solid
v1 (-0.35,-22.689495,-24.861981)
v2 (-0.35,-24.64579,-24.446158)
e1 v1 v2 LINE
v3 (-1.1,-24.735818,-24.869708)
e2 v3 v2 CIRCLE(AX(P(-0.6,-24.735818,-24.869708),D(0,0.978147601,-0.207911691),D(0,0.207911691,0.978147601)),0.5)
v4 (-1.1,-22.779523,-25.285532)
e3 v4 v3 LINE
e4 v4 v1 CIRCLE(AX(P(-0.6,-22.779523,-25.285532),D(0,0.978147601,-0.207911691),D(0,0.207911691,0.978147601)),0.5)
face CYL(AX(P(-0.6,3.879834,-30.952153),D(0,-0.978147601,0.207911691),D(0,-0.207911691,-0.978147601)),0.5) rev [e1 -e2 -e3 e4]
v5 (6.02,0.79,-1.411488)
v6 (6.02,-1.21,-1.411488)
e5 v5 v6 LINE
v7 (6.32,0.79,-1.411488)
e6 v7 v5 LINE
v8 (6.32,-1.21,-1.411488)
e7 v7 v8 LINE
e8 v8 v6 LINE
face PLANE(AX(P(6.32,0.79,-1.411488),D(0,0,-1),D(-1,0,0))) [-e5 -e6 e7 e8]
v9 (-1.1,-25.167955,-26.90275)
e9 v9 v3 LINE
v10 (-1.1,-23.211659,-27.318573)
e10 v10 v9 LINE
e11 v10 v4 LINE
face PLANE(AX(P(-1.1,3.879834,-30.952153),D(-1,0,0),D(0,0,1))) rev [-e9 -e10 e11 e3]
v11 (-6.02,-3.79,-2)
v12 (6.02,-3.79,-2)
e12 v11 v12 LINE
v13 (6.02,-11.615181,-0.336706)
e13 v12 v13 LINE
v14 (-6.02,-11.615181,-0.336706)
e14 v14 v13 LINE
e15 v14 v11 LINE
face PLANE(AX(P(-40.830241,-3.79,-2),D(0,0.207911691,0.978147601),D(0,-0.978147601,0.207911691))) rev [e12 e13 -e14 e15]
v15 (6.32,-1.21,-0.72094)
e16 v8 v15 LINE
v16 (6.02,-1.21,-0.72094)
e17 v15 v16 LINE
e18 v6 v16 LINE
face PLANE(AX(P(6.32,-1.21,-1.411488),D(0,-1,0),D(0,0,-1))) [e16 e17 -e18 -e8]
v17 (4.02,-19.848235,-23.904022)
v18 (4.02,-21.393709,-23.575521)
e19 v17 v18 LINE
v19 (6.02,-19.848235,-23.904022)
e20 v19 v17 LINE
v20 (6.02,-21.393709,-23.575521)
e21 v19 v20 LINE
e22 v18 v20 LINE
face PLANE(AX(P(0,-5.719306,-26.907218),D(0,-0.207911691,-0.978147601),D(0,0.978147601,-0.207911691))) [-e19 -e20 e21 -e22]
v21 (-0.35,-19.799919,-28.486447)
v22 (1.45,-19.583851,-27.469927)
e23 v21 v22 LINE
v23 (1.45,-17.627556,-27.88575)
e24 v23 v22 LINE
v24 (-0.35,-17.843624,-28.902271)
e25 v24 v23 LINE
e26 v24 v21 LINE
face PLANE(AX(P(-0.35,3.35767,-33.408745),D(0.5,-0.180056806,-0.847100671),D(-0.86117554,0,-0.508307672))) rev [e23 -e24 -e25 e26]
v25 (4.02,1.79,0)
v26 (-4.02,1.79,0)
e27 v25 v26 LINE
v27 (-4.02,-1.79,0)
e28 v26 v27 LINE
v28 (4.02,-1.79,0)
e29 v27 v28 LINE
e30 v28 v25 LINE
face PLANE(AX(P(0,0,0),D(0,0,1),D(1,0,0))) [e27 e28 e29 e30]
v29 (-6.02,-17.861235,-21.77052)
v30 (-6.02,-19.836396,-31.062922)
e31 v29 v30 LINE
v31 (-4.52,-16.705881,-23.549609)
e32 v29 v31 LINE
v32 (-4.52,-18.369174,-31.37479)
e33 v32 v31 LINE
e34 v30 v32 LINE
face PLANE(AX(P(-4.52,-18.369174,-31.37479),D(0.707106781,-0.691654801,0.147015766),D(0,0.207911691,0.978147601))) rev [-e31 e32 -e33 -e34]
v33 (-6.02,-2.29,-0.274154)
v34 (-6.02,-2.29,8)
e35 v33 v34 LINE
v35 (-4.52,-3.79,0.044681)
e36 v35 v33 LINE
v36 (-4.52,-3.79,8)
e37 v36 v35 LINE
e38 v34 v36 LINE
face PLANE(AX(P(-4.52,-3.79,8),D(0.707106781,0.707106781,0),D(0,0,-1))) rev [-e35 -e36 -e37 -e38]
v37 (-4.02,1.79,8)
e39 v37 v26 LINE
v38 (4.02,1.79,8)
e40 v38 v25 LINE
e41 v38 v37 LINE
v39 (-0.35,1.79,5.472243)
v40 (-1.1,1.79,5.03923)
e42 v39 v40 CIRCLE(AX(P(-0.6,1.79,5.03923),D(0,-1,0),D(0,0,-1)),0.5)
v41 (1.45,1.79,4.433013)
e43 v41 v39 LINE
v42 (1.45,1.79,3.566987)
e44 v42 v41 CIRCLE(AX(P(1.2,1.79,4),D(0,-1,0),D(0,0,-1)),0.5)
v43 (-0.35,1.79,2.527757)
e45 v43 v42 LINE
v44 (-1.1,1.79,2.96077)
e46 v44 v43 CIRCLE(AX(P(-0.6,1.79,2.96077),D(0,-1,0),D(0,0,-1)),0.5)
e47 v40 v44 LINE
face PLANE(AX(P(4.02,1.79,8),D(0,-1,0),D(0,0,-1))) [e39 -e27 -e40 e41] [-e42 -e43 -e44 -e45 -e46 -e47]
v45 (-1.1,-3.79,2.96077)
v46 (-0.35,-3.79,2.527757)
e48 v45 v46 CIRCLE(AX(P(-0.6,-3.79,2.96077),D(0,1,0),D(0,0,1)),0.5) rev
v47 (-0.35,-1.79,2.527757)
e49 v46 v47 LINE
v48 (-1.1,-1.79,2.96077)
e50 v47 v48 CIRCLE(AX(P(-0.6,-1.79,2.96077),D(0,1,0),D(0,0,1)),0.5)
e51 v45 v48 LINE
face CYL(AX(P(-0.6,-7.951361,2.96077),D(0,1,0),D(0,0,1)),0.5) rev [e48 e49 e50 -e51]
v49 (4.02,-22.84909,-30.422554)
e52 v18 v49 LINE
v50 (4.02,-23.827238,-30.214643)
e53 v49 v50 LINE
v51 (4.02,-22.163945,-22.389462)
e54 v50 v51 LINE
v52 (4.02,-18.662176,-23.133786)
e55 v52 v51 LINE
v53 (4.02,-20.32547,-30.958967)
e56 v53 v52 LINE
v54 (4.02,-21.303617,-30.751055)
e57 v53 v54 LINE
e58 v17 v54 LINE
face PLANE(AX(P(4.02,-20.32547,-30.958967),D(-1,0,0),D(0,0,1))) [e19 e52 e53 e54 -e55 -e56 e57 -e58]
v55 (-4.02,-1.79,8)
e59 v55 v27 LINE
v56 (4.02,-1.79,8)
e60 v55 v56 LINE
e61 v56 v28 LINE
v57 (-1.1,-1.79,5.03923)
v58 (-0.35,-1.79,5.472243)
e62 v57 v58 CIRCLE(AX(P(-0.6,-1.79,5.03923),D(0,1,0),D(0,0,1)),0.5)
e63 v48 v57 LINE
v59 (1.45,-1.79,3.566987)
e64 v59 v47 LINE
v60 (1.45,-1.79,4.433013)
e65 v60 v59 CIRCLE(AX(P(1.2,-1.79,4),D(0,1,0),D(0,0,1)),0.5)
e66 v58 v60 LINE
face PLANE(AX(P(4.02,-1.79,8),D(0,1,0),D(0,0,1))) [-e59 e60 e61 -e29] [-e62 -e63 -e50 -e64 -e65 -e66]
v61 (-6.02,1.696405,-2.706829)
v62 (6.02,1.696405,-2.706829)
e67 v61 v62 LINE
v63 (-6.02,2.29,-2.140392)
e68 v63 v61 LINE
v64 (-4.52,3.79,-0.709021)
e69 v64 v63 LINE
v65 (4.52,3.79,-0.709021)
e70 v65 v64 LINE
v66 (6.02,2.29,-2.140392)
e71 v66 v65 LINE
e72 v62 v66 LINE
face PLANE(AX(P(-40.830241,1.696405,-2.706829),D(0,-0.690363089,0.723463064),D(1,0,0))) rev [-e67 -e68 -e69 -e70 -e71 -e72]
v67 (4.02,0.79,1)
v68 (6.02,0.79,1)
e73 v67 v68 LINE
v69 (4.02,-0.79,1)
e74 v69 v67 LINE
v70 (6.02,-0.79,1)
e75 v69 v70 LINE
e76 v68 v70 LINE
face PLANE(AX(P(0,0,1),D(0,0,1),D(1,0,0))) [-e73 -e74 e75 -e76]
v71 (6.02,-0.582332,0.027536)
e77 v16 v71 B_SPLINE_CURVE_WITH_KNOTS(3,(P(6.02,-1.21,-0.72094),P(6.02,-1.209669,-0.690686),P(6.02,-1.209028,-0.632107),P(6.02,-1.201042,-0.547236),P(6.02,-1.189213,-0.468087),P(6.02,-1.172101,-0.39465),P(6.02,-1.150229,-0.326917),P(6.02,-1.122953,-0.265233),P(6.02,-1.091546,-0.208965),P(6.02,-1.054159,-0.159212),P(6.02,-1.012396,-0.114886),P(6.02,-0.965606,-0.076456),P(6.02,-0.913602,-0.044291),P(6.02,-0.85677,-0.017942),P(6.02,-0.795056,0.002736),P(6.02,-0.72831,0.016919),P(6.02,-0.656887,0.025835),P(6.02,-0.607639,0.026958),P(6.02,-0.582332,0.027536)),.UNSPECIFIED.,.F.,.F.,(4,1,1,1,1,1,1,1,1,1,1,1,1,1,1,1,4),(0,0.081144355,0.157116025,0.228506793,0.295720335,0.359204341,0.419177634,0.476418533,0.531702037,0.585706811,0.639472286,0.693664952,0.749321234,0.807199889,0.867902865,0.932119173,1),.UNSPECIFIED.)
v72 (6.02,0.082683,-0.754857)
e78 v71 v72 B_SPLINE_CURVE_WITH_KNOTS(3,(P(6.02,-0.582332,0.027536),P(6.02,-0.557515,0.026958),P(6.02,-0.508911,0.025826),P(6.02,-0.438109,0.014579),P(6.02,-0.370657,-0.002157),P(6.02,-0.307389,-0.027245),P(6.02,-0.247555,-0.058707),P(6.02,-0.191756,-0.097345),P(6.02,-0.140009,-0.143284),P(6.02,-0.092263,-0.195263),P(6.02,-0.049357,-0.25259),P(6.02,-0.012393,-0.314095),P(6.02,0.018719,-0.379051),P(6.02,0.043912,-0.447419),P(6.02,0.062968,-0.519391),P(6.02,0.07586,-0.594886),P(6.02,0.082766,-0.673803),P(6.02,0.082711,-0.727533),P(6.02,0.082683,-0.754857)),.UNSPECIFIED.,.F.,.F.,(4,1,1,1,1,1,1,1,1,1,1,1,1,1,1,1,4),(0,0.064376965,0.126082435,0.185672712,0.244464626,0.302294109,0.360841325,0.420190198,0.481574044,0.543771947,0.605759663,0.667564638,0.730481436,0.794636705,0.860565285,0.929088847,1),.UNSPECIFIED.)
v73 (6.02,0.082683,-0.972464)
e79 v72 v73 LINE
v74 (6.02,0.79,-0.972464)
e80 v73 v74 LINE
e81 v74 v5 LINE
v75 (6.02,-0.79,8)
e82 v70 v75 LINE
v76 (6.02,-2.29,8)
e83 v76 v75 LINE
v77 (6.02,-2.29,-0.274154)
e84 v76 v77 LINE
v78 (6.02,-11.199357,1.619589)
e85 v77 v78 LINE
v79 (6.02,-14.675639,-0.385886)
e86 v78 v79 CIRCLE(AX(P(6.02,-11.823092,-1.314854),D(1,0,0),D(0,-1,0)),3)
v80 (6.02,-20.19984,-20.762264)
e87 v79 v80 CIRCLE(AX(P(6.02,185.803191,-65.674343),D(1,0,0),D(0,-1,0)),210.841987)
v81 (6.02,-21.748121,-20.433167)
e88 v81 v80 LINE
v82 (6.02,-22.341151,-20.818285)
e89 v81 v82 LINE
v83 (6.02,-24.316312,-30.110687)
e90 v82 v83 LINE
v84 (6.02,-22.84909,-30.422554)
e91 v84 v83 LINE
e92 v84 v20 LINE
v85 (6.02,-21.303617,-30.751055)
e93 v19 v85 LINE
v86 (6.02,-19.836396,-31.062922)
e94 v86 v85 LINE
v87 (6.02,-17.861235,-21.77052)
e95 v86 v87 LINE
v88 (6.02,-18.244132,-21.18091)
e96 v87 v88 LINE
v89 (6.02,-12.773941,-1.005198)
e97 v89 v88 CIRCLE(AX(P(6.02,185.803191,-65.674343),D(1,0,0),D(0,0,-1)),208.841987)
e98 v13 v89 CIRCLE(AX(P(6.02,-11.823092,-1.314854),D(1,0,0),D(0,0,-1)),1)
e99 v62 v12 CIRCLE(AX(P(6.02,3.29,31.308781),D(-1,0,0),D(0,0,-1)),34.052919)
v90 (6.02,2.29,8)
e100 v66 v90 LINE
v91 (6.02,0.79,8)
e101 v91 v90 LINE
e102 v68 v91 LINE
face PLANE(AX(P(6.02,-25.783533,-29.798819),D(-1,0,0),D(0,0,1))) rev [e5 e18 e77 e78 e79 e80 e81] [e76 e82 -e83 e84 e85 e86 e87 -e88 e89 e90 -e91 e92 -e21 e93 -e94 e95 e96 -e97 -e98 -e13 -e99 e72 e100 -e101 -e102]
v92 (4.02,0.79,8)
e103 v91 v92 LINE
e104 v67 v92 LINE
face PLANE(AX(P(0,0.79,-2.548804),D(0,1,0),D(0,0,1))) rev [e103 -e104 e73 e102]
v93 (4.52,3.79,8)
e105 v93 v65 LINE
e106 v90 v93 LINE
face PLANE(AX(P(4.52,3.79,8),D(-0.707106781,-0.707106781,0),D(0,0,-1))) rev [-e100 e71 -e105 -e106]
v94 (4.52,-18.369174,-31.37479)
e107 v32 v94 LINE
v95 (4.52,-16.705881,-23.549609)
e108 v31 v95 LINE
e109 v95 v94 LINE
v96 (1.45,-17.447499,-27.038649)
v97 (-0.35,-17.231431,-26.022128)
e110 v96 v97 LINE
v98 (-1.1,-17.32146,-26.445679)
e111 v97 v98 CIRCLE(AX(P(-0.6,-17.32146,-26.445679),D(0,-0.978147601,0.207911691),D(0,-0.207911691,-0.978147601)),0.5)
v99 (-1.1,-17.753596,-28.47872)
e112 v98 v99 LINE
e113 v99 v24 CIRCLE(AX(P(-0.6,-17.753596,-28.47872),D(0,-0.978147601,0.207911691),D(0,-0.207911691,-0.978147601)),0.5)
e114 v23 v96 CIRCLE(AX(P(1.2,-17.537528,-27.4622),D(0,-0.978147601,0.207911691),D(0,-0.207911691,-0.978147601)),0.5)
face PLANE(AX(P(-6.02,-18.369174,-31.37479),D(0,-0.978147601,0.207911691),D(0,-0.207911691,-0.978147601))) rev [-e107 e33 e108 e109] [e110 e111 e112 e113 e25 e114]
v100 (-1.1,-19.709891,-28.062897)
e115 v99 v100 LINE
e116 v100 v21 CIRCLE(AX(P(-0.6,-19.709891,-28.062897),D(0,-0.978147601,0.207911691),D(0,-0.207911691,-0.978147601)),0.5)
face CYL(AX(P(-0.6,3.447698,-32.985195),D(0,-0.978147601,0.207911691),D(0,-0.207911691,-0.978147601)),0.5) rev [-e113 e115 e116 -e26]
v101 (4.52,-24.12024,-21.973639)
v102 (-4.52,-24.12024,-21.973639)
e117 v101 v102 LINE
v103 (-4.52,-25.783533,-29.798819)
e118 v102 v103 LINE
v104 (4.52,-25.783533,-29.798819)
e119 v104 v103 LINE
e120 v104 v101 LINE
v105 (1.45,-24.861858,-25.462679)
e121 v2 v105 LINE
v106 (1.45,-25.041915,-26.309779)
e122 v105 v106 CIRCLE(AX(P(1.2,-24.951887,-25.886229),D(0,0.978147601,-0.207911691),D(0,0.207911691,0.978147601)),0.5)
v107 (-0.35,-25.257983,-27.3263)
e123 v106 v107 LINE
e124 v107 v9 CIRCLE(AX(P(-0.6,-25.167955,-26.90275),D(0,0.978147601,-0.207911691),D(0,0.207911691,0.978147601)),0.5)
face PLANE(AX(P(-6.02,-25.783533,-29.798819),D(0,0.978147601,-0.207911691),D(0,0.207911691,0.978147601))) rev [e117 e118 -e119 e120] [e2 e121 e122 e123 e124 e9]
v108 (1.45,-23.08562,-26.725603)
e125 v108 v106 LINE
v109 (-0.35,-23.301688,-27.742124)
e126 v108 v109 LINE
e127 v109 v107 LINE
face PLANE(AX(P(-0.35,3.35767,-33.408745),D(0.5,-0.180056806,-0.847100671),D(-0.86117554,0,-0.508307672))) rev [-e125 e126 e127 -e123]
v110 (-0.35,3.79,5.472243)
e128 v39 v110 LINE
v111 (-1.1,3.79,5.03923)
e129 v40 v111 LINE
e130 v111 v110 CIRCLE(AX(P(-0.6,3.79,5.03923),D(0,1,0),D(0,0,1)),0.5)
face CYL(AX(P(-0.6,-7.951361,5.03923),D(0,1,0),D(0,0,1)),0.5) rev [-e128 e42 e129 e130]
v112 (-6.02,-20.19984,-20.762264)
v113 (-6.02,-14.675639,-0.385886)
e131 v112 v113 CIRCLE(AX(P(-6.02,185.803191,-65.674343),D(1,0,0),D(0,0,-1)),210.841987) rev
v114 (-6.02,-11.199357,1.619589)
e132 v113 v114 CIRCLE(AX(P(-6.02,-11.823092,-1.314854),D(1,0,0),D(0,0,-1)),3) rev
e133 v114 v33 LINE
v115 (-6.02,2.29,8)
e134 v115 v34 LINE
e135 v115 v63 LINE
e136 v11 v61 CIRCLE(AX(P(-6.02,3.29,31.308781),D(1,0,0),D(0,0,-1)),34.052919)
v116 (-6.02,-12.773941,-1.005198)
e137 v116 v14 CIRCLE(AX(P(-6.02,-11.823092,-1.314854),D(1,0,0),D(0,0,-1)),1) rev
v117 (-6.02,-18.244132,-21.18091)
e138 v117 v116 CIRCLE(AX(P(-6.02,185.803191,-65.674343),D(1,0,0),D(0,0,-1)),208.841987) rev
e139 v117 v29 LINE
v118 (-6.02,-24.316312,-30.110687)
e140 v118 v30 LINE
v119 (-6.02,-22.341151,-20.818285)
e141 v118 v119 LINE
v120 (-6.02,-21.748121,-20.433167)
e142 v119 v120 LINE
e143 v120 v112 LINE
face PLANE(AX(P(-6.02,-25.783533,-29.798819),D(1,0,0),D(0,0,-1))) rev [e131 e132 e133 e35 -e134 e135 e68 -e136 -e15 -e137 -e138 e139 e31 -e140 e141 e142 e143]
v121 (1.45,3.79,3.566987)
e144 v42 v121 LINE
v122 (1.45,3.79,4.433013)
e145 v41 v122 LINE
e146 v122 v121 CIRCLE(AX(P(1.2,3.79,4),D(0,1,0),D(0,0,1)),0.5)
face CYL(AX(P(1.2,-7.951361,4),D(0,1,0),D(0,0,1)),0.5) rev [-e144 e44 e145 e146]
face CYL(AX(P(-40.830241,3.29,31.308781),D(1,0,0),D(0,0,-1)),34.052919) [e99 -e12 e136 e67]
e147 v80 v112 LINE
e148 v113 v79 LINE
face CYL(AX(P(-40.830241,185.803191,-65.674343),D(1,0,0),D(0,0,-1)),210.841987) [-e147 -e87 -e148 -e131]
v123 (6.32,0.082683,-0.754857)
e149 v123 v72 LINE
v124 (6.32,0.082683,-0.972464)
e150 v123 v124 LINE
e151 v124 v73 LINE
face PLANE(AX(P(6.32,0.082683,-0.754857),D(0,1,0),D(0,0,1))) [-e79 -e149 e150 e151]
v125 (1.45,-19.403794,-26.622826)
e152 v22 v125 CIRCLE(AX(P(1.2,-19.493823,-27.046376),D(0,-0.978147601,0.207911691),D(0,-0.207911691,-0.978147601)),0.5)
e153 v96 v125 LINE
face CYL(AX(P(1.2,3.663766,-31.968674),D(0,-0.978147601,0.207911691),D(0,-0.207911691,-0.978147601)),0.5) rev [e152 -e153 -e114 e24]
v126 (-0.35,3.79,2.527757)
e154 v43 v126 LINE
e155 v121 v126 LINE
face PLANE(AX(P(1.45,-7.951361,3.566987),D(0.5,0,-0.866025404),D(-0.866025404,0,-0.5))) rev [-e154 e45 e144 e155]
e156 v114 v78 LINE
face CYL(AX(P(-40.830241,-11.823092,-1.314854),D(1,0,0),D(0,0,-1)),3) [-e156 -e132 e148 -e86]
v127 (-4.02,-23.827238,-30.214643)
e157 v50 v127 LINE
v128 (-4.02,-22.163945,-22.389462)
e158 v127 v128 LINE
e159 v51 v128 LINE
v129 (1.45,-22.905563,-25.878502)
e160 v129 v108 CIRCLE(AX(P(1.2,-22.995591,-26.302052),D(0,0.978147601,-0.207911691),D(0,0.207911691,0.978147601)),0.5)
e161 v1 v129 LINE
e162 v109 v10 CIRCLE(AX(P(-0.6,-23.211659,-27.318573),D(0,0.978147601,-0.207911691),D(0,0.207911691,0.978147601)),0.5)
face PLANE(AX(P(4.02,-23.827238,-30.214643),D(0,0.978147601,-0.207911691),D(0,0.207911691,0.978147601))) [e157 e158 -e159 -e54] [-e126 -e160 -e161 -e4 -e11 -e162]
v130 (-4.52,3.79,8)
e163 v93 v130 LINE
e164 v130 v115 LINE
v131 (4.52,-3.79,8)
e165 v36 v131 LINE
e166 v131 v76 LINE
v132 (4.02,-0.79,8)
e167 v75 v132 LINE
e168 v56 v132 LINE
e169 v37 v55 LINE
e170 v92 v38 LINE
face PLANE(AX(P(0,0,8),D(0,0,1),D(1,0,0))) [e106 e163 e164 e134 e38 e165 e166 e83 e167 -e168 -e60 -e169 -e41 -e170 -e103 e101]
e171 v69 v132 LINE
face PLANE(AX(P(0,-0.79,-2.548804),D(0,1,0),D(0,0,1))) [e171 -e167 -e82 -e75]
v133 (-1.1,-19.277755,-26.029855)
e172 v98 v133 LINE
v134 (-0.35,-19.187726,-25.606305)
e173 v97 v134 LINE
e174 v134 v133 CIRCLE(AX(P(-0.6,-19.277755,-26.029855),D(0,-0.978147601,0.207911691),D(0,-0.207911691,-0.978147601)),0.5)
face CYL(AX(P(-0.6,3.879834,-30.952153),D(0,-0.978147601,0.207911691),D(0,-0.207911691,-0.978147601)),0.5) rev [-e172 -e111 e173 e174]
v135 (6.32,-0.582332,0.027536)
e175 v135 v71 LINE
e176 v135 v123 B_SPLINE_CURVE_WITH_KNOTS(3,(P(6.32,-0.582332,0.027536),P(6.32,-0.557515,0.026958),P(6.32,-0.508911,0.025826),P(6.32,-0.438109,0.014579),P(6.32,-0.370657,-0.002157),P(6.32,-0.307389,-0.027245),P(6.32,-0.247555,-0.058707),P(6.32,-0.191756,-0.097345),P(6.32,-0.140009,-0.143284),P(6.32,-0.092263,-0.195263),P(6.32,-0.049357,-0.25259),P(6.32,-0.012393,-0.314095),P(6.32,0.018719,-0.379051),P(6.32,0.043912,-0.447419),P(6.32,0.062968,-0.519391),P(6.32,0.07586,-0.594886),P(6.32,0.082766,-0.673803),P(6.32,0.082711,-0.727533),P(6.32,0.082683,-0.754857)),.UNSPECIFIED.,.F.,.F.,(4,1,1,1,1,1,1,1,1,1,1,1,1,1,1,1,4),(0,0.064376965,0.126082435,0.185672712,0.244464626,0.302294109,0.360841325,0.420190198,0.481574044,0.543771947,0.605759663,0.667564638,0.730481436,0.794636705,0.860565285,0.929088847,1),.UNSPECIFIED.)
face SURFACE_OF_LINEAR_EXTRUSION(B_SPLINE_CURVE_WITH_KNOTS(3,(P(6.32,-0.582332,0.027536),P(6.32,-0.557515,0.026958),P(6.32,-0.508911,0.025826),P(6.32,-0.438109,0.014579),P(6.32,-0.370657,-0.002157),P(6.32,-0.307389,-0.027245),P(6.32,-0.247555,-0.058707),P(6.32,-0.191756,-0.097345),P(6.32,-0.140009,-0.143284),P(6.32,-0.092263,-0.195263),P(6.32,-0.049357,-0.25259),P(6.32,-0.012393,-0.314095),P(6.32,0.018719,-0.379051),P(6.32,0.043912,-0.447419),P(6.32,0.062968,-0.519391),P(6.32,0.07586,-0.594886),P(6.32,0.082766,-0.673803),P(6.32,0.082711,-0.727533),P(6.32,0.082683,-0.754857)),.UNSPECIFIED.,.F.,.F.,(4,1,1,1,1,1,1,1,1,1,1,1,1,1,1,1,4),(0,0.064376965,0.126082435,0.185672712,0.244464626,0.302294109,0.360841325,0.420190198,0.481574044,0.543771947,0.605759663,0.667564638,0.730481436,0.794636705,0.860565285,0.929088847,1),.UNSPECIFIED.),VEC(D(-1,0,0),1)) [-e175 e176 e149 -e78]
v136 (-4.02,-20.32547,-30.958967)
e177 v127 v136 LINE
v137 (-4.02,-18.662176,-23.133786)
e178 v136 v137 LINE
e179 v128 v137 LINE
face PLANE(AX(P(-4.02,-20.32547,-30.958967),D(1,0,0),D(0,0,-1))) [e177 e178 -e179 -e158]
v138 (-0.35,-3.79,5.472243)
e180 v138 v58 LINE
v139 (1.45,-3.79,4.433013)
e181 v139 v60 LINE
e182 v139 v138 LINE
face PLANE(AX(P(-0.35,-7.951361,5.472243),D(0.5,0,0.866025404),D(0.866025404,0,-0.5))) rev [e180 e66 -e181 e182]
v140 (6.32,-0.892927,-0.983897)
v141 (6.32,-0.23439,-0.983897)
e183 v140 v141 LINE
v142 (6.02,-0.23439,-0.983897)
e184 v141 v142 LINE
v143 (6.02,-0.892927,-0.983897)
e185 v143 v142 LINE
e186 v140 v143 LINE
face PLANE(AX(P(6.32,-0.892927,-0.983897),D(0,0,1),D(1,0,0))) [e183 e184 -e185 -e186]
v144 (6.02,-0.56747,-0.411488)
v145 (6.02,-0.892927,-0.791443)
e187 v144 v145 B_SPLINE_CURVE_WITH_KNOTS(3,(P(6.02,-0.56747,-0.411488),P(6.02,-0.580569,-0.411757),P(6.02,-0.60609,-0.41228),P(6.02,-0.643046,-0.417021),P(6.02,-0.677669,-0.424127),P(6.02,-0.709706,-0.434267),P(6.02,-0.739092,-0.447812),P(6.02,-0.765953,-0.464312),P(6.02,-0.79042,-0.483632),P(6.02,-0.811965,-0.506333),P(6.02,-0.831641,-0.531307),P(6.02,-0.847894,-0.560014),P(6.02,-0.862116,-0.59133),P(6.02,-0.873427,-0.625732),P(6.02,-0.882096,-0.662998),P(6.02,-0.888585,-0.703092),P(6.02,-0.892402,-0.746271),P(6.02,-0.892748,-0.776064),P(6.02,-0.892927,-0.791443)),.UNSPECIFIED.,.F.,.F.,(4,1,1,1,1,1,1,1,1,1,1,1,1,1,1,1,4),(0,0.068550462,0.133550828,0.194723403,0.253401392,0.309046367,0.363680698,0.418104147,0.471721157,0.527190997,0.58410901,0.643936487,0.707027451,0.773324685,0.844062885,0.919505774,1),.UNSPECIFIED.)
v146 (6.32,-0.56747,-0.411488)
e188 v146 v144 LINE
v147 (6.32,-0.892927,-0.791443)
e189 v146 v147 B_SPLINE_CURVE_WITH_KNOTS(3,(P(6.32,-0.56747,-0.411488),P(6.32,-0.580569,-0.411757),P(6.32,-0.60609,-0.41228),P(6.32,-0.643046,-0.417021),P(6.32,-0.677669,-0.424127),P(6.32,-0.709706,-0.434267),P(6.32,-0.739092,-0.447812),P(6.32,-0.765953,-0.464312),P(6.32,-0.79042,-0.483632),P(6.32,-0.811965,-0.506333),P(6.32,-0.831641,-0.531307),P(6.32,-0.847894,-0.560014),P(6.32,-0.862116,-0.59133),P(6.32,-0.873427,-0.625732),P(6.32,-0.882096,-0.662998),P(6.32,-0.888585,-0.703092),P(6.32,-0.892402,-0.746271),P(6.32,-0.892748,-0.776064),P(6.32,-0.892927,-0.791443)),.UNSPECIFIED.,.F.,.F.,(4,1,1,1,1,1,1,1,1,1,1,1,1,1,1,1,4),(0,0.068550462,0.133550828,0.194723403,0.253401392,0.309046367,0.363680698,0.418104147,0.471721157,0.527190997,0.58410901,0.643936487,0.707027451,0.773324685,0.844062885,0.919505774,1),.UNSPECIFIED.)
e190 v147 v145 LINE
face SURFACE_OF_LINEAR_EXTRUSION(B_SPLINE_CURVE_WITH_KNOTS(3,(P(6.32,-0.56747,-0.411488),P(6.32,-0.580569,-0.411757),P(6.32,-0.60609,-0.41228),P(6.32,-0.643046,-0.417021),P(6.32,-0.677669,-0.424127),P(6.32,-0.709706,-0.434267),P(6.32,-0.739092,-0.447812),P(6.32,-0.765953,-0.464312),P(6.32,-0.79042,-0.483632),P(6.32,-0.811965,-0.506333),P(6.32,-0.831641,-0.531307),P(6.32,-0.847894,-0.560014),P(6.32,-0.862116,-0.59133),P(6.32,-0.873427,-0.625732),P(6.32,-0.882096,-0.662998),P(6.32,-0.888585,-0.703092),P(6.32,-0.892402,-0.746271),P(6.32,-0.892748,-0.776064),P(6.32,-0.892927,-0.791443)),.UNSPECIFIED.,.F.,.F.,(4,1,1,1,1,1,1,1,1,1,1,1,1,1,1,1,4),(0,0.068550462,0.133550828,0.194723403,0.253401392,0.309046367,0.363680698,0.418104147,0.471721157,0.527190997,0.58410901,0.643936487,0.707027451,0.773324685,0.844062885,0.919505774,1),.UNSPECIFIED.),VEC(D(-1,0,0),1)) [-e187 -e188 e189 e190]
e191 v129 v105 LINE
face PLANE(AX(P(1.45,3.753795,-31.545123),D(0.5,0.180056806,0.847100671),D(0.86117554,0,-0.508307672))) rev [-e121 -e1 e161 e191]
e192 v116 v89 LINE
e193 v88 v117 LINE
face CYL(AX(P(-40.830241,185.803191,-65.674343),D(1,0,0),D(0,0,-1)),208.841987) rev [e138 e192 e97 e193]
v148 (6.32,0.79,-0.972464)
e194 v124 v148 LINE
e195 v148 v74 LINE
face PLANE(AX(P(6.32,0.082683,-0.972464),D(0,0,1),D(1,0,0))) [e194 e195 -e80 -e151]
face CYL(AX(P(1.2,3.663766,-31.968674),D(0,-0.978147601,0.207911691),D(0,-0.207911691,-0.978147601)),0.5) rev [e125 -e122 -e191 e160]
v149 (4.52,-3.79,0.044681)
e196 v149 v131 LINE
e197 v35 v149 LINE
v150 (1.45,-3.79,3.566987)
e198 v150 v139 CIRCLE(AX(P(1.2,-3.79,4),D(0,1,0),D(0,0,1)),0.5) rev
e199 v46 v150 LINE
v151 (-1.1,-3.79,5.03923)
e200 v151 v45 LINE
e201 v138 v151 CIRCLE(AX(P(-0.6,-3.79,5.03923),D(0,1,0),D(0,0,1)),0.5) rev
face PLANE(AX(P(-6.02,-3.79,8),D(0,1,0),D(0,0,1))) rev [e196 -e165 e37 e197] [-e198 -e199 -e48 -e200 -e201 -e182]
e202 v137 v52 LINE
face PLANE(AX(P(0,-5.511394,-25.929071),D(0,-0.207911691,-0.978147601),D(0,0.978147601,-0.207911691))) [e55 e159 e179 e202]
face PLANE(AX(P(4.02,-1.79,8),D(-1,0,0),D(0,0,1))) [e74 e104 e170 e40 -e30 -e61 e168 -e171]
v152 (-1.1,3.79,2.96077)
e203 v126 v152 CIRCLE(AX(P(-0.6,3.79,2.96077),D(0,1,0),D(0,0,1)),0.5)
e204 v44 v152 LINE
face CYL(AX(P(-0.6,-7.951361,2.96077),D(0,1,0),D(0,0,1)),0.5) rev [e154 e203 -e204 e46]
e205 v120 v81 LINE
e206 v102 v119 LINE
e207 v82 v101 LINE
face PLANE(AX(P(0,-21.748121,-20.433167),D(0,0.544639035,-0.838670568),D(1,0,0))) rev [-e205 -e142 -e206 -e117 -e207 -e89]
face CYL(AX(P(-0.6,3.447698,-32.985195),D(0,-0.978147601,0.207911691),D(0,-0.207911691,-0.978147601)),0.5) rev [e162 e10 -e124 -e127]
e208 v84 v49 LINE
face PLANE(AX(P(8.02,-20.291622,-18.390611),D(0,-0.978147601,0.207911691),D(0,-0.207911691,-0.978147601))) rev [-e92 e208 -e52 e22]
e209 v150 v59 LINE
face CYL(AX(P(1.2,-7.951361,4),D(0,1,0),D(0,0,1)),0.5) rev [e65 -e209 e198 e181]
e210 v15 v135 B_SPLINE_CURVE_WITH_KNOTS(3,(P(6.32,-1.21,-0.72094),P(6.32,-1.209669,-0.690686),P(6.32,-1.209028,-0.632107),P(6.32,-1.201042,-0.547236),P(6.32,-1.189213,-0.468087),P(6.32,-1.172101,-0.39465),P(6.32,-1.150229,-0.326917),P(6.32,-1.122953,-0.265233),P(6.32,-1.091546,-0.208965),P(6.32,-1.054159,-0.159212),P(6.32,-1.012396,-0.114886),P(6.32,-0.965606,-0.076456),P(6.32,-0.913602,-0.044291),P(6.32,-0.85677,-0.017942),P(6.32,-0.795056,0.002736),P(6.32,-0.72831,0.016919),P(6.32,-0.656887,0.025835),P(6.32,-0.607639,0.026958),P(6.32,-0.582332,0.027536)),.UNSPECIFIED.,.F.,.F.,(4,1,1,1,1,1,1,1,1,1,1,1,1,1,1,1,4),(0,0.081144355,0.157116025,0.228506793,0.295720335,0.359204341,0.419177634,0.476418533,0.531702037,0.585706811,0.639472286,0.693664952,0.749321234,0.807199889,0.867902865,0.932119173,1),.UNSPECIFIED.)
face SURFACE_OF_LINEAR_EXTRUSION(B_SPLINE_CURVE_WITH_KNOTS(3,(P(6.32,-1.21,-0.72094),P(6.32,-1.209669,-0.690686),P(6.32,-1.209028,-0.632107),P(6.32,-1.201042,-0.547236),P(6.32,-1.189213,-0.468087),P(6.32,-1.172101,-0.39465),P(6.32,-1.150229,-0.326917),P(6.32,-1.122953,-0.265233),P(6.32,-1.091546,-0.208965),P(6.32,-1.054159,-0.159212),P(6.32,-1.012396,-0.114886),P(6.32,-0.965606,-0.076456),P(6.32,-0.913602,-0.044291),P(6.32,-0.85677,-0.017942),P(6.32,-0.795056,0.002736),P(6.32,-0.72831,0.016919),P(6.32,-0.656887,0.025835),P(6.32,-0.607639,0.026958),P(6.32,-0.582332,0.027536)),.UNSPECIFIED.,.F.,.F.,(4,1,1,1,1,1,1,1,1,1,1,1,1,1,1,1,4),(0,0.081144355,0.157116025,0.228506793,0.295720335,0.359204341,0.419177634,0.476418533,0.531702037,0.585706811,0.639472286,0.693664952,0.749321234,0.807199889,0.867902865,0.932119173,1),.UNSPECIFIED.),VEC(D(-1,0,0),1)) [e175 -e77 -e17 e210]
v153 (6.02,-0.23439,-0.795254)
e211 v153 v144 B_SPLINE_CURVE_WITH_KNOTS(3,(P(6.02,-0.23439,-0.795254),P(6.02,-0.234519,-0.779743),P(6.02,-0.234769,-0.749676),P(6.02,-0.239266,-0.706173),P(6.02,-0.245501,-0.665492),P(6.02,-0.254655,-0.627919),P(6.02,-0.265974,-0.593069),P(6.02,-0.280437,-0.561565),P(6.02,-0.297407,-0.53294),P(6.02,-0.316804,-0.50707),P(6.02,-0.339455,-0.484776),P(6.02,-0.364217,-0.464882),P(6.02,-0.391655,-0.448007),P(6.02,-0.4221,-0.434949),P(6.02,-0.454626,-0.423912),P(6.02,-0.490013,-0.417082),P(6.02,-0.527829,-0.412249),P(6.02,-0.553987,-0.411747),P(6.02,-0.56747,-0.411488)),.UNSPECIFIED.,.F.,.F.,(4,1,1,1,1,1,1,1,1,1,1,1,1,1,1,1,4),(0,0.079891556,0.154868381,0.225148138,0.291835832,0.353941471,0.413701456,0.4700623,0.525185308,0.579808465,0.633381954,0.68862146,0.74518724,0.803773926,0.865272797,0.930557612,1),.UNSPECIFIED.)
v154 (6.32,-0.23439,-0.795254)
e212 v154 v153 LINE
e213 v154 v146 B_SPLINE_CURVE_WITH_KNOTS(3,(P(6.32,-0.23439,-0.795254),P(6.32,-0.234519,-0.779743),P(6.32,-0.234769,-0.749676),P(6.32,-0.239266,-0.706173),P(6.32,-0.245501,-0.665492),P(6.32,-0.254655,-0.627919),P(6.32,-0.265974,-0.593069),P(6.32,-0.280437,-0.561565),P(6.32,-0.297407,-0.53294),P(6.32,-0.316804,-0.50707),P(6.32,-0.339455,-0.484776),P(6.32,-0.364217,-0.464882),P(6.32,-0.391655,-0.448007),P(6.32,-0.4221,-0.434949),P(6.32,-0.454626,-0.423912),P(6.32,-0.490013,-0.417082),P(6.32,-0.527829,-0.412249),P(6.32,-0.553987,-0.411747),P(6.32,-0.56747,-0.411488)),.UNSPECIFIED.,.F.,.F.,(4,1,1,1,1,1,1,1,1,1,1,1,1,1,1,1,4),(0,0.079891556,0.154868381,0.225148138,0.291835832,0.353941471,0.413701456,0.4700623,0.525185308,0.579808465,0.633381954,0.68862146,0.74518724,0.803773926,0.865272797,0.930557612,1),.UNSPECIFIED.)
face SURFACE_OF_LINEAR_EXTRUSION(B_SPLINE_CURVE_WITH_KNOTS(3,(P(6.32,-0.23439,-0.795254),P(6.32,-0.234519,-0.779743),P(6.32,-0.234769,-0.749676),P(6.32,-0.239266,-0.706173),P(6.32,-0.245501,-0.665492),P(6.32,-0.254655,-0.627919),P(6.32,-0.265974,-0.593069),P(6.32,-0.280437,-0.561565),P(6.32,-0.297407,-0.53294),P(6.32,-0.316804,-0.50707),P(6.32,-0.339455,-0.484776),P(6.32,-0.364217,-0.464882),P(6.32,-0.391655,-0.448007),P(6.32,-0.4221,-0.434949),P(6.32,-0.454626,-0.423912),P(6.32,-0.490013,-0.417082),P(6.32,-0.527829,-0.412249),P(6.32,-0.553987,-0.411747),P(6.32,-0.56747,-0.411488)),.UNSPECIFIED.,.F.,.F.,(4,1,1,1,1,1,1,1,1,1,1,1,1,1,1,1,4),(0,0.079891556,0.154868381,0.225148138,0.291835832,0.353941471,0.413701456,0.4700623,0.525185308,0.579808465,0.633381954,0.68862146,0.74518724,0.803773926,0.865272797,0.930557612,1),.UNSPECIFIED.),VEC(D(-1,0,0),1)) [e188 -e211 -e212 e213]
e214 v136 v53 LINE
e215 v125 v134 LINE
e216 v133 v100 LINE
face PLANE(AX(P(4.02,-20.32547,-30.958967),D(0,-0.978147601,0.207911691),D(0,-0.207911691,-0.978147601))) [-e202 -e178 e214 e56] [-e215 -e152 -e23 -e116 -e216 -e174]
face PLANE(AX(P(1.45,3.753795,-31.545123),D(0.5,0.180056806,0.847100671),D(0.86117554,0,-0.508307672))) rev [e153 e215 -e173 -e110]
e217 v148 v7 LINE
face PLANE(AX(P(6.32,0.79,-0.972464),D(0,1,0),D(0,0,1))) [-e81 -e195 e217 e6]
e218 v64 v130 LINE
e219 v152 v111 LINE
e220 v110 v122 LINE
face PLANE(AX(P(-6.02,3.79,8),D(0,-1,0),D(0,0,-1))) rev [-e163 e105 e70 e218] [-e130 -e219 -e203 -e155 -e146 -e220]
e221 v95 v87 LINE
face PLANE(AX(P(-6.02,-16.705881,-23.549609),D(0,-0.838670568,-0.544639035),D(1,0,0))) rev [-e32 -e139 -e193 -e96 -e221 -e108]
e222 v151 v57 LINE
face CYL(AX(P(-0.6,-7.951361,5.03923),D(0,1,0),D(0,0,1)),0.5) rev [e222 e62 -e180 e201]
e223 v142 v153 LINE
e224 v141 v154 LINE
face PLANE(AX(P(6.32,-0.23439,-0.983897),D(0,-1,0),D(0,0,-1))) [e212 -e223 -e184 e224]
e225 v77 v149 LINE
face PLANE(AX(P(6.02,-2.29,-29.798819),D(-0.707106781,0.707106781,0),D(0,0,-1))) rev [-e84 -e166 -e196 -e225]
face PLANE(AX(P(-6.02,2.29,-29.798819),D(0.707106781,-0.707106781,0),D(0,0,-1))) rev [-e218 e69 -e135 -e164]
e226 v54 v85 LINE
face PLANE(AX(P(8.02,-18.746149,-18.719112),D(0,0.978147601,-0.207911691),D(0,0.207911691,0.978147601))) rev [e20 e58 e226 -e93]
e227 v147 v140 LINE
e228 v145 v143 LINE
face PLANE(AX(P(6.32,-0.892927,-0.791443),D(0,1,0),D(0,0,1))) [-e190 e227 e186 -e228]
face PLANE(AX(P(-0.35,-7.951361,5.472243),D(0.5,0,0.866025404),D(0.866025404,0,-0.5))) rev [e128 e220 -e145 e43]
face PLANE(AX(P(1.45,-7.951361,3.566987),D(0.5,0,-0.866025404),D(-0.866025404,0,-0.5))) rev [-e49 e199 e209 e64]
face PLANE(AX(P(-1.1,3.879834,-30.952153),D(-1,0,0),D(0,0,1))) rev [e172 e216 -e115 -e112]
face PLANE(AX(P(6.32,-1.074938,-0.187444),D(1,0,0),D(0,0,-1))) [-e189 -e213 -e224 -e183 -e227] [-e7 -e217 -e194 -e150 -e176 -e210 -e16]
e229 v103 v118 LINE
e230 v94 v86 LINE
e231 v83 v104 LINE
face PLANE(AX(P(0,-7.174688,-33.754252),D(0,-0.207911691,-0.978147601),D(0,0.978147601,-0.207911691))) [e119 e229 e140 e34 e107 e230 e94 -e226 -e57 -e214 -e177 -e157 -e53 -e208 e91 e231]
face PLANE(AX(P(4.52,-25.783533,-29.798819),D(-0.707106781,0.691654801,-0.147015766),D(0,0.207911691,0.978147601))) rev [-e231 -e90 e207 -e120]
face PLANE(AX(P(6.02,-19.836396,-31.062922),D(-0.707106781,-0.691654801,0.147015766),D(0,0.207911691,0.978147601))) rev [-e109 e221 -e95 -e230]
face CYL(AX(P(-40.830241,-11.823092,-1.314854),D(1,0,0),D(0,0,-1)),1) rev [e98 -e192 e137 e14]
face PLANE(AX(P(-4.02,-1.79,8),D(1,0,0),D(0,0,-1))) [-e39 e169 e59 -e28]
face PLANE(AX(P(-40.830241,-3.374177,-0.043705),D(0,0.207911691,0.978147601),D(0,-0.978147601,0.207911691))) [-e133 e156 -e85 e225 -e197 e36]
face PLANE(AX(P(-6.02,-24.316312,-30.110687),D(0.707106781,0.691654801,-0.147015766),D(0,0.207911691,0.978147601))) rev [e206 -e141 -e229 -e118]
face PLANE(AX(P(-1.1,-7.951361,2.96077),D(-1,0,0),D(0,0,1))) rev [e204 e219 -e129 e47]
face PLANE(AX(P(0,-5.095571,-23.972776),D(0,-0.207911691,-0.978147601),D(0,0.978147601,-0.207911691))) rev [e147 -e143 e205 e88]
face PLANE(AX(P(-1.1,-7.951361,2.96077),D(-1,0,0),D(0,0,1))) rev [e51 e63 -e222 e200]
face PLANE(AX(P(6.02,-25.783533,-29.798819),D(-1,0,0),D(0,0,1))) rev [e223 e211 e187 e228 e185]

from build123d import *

# Parameters (mm, degrees)
SKETCH1_W                      = 12.04
SKETCH1_H                      = 7.58
SKETCH1_W_2                    = 8.04
SKETCH1_H_2                    = 3.58
BOSS_EXTRUDE1_DEPTH            = 8
SKETCH1_2_W                    = 12.04
SKETCH1_2_H                    = 7.58
SKETCH1_2_W_2                  = 8.04
SKETCH1_2_H_2                  = 3.58
BOSS_EXTRUDE2_DEPTH            = 2
EXTRUDE_THIN1_DEPTH            = 12.04
SKETCH5_W                      = 12.04
SKETCH5_H                      = 7.58
SKETCH5_W_2                    = 8.04
SKETCH5_H_2                    = 3.58
BOSS_EXTRUDE4_DEPTH            = 8
SKETCH5_4_W                    = 12.04
SKETCH5_4_H                    = 7.58
BOSS_EXTRUDE5_DEPTH            = 2
CHAMFER1_SIZE                  = 1.5
CHAMFER2_START                 = -7
CHAMFER2_DEPTH                 = 14
CUT_EXTRUDE1_REACH             = 45.534
CUT_EXTRUDE1_DIRECTION_2_DEPTH = 44.534029429
CUT_EXTRUDE2_DEPTH             = 43.263143381
CUT_EXTRUDE2_DEPTH_BACK        = 43.263143381
SKETCH8_W                      = 2
SKETCH8_H                      = 1.58
CUT_EXTRUDE3_DEPTH             = 7
SKETCH9_W                      = 4
SKETCH9_H                      = 1.58
CUT_EXTRUDE4_DEPTH             = 7
BOSS_EXTRUDE7_DEPTH            = 0.3


with BuildPart() as part:
    # Sketch1 → Boss-Extrude1 (new body)
    with BuildSketch(Plane.XY):
        Rectangle(SKETCH1_W, SKETCH1_H)
        Rectangle(SKETCH1_W_2, SKETCH1_H_2, mode=Mode.SUBTRACT)
    extrude(amount=BOSS_EXTRUDE1_DEPTH)

    # Sketch1<2> → Boss-Extrude2 (add)
    # profile 1 of 2: a face of its own
    with BuildSketch(Plane.XY):
        Rectangle(SKETCH1_2_W, SKETCH1_2_H)
        Rectangle(SKETCH1_2_W_2, SKETCH1_2_H_2, mode=Mode.SUBTRACT)
    # profile 2 of 2: a face of its own
    with BuildSketch(Plane.XY):
        Rectangle(SKETCH1_2_W_2, SKETCH1_2_H_2)
    extrude(amount=-BOSS_EXTRUDE2_DEPTH)

    # Sketch3 → Extrude-Thin1 (add)
    with BuildSketch(Plane(origin=(6.02, 9.81, 0), x_dir=(0, -1, 0), z_dir=(1, 0, 0))):
        with BuildLine():
            Line((6.02, 2.744137986), (6.52, 2.744137986))
            ThreePointArc((6.52, 2.744137986), (10.07949931, 2.557592532), (13.6, 2))
            Line((13.6, 2), (21.425180806, 0.336706473))
            ThreePointArc((21.425180806, 0.336706473), (22.132801564, 0.448660765), (22.583941196, 1.005198215))
            ThreePointArc((22.583941196, 1.005198215), (25.714510404, 11.554301253), (28.285098031, 22.253652529))
            Line((28.285098031, 22.253652529), (28.472176136, 23.133785819))
            Line((28.472176136, 23.133785819), (30.428471338, 22.717962437))
            Line((30.428471338, 22.717962437), (30.241393232, 21.837829148))
            ThreePointArc((30.241393232, 21.837829148), (27.646188069, 11.036014268), (24.485638594, 0.385886497))
            ThreePointArc((24.485638594, 0.385886497), (23.132219698, -1.283725852), (21.009357424, -1.619588728))
            Line((21.009357424, -1.619588728), (13.184176618, 0.043704799))
            ThreePointArc((13.184176618, 0.043704799), (9.870442383, 0.568548741), (6.52, 0.744137986))
            Line((6.52, 0.744137986), (6.02, 0.744137986))
            Line((6.02, 0.744137986), (6.02, 2.744137986))
        make_face()
    extrude(amount=-EXTRUDE_THIN1_DEPTH)



with BuildPart() as body_2:
    # Sketch5 → Boss-Extrude4 (new body)
    with BuildSketch(Plane(origin=(0, 485.418561105, -130.279454131), x_dir=(1, 0, 0), z_dir=(0, -0.20791169081775487, -0.9781476007338067))):
        with Locations((0, 517.132200771)):
            Rectangle(SKETCH5_W, SKETCH5_H)
        with Locations((0, 517.132200771)):
            Rectangle(SKETCH5_W_2, SKETCH5_H_2, mode=Mode.SUBTRACT)
    extrude(amount=BOSS_EXTRUDE4_DEPTH)


with BuildPart() as part_1:
    add(part.part)

    add(body_2.part)  # Boss-Extrude5 merges body 2
    # Sketch5<4> → Boss-Extrude5 (add)
    with BuildSketch(Plane(origin=(0, 485.418561105, -130.279454131), x_dir=(1, 0, 0), z_dir=(0, -0.20791169081775487, -0.9781476007338067))):
        with Locations((0, 517.132200771)):
            Rectangle(SKETCH5_4_W, SKETCH5_4_H)
    extrude(amount=-BOSS_EXTRUDE5_DEPTH)

    # Chamfer1
    chamfer1_edges = [part_1.edges().sort_by_distance(p)[0] for p in [
        (6.02, -24.743974821, -24.908081386),
        (-6.02, -24.743974821, -24.908081386),
        (6.02, 3.79, 2.627931007),
        (6.02, -3.79, 4.022340595),
        (-6.02, -3.79, 4.022340595),
        (-6.02, 3.79, 2.627931007),
        (6.02, -17.329616007, -26.484052003),
        (-6.02, -17.329616007, -26.484052003),
    ]]
    chamfer(chamfer1_edges, length=CHAMFER1_SIZE)

    # Chamfer2: read off the stored shape, not the designer's step
    # Chamfer2 outline → Chamfer2 (cut)
    with BuildSketch(Plane.YZ.offset(CHAMFER2_START)):
        with BuildLine():
            Line((3.79, -2.744137986), (3.79, -0.709020541))
            Line((3.79, -0.709020541), (1.696404781, -2.706829325))
            ThreePointArc((1.696404781, -2.706829325), (2.492984056, -2.734809543), (3.29, -2.744137986))
            Line((3.29, -2.744137986), (3.79, -2.744137986))
        make_face()
        Polygon((-23.704416367, -20.017343383), (-24.120239749, -21.973638584), (-21.748121165, -20.433166764), align=None)
        with BuildLine():
            ThreePointArc((-18.243518062, -21.17809315), (-18.243825174, -21.1795015), (-18.244132277, -21.180909853))
            Line((-18.244132277, -21.180909853), (-16.705880935, -23.549609201))
            Line((-16.705880935, -23.549609201), (-16.290057553, -21.593313999))
            Line((-16.290057553, -21.593313999), (-18.243518062, -21.17809315))
        make_face()
    extrude(amount=CHAMFER2_DEPTH, mode=Mode.SUBTRACT)

    # Cut-Extrude1: up to this face of the body (flat: up to its plane)
    cut_extrude1_end = Plane(part_1.part.faces().sort_by_distance((0, -3.79, 4.022340595))[0])
    # Sketch6 → Cut-Extrude1 (cut, up to the picked face)
    with BuildSketch(Plane(origin=(0, 3.79, 0), x_dir=(1, 0, 0), z_dir=(0, 1, 0)), mode=Mode.PRIVATE) as cut_extrude1_sk1:
        with BuildLine():
            Line((1.45, -3.566987298), (-0.35, -2.527756814))
            ThreePointArc((-0.35, -2.527756814), (-0.85, -2.527756814), (-1.1, -2.960769515))
            Line((-1.1, -2.960769515), (-1.1, -5.039230485))
            ThreePointArc((-1.1, -5.039230485), (-0.85, -5.472243186), (-0.35, -5.472243186))
            Line((-0.35, -5.472243186), (1.45, -4.433012702))
            ThreePointArc((1.45, -4.433012702), (1.7, -4), (1.45, -3.566987298))
        make_face()
    cut_extrude1_tool1 = split(extrude(cut_extrude1_sk1.sketch, amount=-CUT_EXTRUDE1_REACH, mode=Mode.PRIVATE), bisect_by=cut_extrude1_end, keep=Keep.BOTH, mode=Mode.PRIVATE)
    add(cut_extrude1_tool1.solids().sort_by(Axis((0, 3.79, 4), (0, -1, 0)))[0], mode=Mode.SUBTRACT)

    # Sketch6 → Cut-Extrude1 direction 2 (cut)
    with BuildSketch(Plane(origin=(0, 3.79, 0), x_dir=(1, 0, 0), z_dir=(0, 1, 0))):
        with BuildLine():
            Line((1.45, -3.566987298), (-0.35, -2.527756814))
            ThreePointArc((-0.35, -2.527756814), (-0.85, -2.527756814), (-1.1, -2.960769515))
            Line((-1.1, -2.960769515), (-1.1, -5.039230485))
            ThreePointArc((-1.1, -5.039230485), (-0.85, -5.472243186), (-0.35, -5.472243186))
            Line((-0.35, -5.472243186), (1.45, -4.433012702))
            ThreePointArc((1.45, -4.433012702), (1.7, -4), (1.45, -3.566987298))
        make_face()
    extrude(amount=CUT_EXTRUDE1_DIRECTION_2_DEPTH, mode=Mode.SUBTRACT)

    # Sketch7 → Cut-Extrude2 (cut, two sides: drawn at the far end of the back side and taken through both)
    with BuildSketch(Plane(origin=(0, -18.608845607, 3.955432239), x_dir=(1, 0, 0), z_dir=(0, -0.9781476007338067, 0.2079116908177549)).offset(-CUT_EXTRUDE2_DEPTH_BACK)):
        with BuildLine():
            Line((1.45, -30.075328988), (-0.35, -29.036098503))
            ThreePointArc((-0.35, -29.036098503), (-0.85, -29.036098503), (-1.1, -29.469111205))
            Line((-1.1, -29.469111205), (-1.1, -31.547572174))
            ThreePointArc((-1.1, -31.547572174), (-0.85, -31.980584876), (-0.35, -31.980584876))
            Line((-0.35, -31.980584876), (1.45, -30.941354391))
            ThreePointArc((1.45, -30.941354391), (1.7, -30.508341689), (1.45, -30.075328988))
        make_face()
    extrude(amount=CUT_EXTRUDE2_DEPTH + CUT_EXTRUDE2_DEPTH_BACK, mode=Mode.SUBTRACT)

    # Sketch8 → Cut-Extrude3 (cut)
    with BuildSketch(Plane.XY.offset(8)):
        with Locations((5.02, 0)):
            Rectangle(SKETCH8_W, SKETCH8_H)
    extrude(amount=-CUT_EXTRUDE3_DEPTH, mode=Mode.SUBTRACT)

    # Sketch9 → Cut-Extrude4 (cut)
    with BuildSketch(Plane(origin=(0, -7.174687668, -33.754251629), x_dir=(-1, 0, 0), z_dir=(0, -0.20791169081775673, -0.9781476007338064))):
        with Locations((-6.02, -15.234578288)):
            Rectangle(SKETCH9_W, SKETCH9_H)
    extrude(amount=-CUT_EXTRUDE4_DEPTH, mode=Mode.SUBTRACT)

    # Sketch11 → Boss-Extrude7 (add)
    with BuildSketch(Plane(origin=(6.02, 0, -6.02), x_dir=(0, 0, 1), z_dir=(-1, 0, 0))):
        with BuildLine():
            Line((5.047536003, 0.082682927), (5.047536003, 0.79))
            Line((5.047536003, 0.79), (4.608511613, 0.79))
            Line((4.608511613, 0.79), (4.608511613, -1.21))
            Line((4.608511613, -1.21), (5.299060394, -1.21))
            add(Edge.make_bspline(
                [(5.299060394, -1.21), (5.329313952, -1.209669089), (5.387892505, -1.20902836), (5.472763934, -1.201041655), (5.551912875, -1.189213366), (5.625349672, -1.172100798), (5.693083305, -1.150229064), (5.754766894, -1.122952683), (5.811034602, -1.091546463), (5.860787755, -1.054159212), (5.905113914, -1.0123961), (5.943543862, -0.965606031), (5.975708858, -0.913602215), (6.002058422, -0.856769543), (6.02273613, -0.795055664), (6.036919265, -0.728309994), (6.045834622, -0.656886984), (6.046958484, -0.607639268), (6.047536003, -0.582332317)],
                knots=[0, 0, 0, 0, 1.298309684, 2.513856393, 3.656108695, 4.731525363, 5.747269452, 6.706842141, 7.622696522, 8.50723259, 9.371308978, 10.231556582, 11.09863924, 11.989139744, 12.915198226, 13.88644584, 14.913906774, 16, 16, 16, 16], degree=3))
            add(Edge.make_bspline(
                [(6.047536003, -0.582332317), (6.046958026, -0.557515305), (6.045826057, -0.50891113), (6.034579341, -0.43810911), (6.01784318, -0.370657155), (5.992755465, -0.307388849), (5.96129274, -0.247554648), (5.922654871, -0.191755979), (5.876715772, -0.140008785), (5.824737087, -0.092263463), (5.76741001, -0.049357043), (5.705904977, -0.012393475), (5.640949178, 0.01871881), (5.572580865, 0.043912433), (5.500609023, 0.062967718), (5.425113901, 0.075859677), (5.346196751, 0.08276557), (5.2924674, 0.082710787), (5.265142711, 0.082682927)],
                knots=[0, 0, 0, 0, 1.030031435, 2.017318961, 2.9707634, 3.911434012, 4.836705747, 5.773461207, 6.723043161, 7.705184701, 8.700351159, 9.692154612, 10.681034209, 11.68770297, 12.714187277, 13.76904456, 14.865421547, 16, 16, 16, 16], degree=3))
            Line((5.265142711, 0.082682927), (5.047536003, 0.082682927))
        make_face()
        with BuildLine():
            Line((5.036103077, -0.892926829), (5.036103077, -0.234390244))
            Line((5.036103077, -0.234390244), (5.224746369, -0.234390244))
            add(Edge.make_bspline(
                [(5.224746369, -0.234390244), (5.240257069, -0.234519065), (5.270324289, -0.234768783), (5.313827436, -0.239266362), (5.354507641, -0.245501395), (5.39208054, -0.254654559), (5.426930993, -0.265974439), (5.458434732, -0.280437451), (5.487059955, -0.297407138), (5.512929634, -0.316804387), (5.535224382, -0.339455254), (5.555117628, -0.364216963), (5.571992729, -0.391655317), (5.585050634, -0.422099729), (5.596087863, -0.45462628), (5.602917978, -0.490012993), (5.607750907, -0.527828853), (5.608252881, -0.553986887), (5.608511613, -0.567469512)],
                knots=[0, 0, 0, 0, 1.278264899, 2.477894098, 3.602370215, 4.669373304, 5.663063542, 6.619223296, 7.520996807, 8.402964925, 9.276935434, 10.134111266, 11.017943356, 11.922995833, 12.86038281, 13.844364746, 14.88892179, 16, 16, 16, 16], degree=3))
            add(Edge.make_bspline(
                [(5.608511613, -0.567469512), (5.608243066, -0.580569264), (5.607719879, -0.606090356), (5.602979451, -0.643045607), (5.595872643, -0.677668866), (5.585733194, -0.709706236), (5.572188175, -0.739091862), (5.555687516, -0.765952955), (5.536368124, -0.790420284), (5.513666923, -0.811964985), (5.488692805, -0.831640584), (5.459986472, -0.847894241), (5.428669687, -0.862115985), (5.394268426, -0.873426519), (5.357002183, -0.882096268), (5.316907649, -0.888585203), (5.273728574, -0.892402235), (5.243936115, -0.892748228), (5.228557345, -0.892926829)],
                knots=[0, 0, 0, 0, 1.096807385, 2.136813243, 3.115574441, 4.054422268, 4.94474187, 5.818891163, 6.689666352, 7.547538513, 8.435055958, 9.345744162, 10.302983784, 11.312439221, 12.373194966, 13.505006157, 14.712092391, 16, 16, 16, 16], degree=3))
            Line((5.228557345, -0.892926829), (5.036103077, -0.892926829))
        make_face(mode=Mode.SUBTRACT)
    extrude(amount=-BOSS_EXTRUDE7_DEPTH)


solid = part_1.part
